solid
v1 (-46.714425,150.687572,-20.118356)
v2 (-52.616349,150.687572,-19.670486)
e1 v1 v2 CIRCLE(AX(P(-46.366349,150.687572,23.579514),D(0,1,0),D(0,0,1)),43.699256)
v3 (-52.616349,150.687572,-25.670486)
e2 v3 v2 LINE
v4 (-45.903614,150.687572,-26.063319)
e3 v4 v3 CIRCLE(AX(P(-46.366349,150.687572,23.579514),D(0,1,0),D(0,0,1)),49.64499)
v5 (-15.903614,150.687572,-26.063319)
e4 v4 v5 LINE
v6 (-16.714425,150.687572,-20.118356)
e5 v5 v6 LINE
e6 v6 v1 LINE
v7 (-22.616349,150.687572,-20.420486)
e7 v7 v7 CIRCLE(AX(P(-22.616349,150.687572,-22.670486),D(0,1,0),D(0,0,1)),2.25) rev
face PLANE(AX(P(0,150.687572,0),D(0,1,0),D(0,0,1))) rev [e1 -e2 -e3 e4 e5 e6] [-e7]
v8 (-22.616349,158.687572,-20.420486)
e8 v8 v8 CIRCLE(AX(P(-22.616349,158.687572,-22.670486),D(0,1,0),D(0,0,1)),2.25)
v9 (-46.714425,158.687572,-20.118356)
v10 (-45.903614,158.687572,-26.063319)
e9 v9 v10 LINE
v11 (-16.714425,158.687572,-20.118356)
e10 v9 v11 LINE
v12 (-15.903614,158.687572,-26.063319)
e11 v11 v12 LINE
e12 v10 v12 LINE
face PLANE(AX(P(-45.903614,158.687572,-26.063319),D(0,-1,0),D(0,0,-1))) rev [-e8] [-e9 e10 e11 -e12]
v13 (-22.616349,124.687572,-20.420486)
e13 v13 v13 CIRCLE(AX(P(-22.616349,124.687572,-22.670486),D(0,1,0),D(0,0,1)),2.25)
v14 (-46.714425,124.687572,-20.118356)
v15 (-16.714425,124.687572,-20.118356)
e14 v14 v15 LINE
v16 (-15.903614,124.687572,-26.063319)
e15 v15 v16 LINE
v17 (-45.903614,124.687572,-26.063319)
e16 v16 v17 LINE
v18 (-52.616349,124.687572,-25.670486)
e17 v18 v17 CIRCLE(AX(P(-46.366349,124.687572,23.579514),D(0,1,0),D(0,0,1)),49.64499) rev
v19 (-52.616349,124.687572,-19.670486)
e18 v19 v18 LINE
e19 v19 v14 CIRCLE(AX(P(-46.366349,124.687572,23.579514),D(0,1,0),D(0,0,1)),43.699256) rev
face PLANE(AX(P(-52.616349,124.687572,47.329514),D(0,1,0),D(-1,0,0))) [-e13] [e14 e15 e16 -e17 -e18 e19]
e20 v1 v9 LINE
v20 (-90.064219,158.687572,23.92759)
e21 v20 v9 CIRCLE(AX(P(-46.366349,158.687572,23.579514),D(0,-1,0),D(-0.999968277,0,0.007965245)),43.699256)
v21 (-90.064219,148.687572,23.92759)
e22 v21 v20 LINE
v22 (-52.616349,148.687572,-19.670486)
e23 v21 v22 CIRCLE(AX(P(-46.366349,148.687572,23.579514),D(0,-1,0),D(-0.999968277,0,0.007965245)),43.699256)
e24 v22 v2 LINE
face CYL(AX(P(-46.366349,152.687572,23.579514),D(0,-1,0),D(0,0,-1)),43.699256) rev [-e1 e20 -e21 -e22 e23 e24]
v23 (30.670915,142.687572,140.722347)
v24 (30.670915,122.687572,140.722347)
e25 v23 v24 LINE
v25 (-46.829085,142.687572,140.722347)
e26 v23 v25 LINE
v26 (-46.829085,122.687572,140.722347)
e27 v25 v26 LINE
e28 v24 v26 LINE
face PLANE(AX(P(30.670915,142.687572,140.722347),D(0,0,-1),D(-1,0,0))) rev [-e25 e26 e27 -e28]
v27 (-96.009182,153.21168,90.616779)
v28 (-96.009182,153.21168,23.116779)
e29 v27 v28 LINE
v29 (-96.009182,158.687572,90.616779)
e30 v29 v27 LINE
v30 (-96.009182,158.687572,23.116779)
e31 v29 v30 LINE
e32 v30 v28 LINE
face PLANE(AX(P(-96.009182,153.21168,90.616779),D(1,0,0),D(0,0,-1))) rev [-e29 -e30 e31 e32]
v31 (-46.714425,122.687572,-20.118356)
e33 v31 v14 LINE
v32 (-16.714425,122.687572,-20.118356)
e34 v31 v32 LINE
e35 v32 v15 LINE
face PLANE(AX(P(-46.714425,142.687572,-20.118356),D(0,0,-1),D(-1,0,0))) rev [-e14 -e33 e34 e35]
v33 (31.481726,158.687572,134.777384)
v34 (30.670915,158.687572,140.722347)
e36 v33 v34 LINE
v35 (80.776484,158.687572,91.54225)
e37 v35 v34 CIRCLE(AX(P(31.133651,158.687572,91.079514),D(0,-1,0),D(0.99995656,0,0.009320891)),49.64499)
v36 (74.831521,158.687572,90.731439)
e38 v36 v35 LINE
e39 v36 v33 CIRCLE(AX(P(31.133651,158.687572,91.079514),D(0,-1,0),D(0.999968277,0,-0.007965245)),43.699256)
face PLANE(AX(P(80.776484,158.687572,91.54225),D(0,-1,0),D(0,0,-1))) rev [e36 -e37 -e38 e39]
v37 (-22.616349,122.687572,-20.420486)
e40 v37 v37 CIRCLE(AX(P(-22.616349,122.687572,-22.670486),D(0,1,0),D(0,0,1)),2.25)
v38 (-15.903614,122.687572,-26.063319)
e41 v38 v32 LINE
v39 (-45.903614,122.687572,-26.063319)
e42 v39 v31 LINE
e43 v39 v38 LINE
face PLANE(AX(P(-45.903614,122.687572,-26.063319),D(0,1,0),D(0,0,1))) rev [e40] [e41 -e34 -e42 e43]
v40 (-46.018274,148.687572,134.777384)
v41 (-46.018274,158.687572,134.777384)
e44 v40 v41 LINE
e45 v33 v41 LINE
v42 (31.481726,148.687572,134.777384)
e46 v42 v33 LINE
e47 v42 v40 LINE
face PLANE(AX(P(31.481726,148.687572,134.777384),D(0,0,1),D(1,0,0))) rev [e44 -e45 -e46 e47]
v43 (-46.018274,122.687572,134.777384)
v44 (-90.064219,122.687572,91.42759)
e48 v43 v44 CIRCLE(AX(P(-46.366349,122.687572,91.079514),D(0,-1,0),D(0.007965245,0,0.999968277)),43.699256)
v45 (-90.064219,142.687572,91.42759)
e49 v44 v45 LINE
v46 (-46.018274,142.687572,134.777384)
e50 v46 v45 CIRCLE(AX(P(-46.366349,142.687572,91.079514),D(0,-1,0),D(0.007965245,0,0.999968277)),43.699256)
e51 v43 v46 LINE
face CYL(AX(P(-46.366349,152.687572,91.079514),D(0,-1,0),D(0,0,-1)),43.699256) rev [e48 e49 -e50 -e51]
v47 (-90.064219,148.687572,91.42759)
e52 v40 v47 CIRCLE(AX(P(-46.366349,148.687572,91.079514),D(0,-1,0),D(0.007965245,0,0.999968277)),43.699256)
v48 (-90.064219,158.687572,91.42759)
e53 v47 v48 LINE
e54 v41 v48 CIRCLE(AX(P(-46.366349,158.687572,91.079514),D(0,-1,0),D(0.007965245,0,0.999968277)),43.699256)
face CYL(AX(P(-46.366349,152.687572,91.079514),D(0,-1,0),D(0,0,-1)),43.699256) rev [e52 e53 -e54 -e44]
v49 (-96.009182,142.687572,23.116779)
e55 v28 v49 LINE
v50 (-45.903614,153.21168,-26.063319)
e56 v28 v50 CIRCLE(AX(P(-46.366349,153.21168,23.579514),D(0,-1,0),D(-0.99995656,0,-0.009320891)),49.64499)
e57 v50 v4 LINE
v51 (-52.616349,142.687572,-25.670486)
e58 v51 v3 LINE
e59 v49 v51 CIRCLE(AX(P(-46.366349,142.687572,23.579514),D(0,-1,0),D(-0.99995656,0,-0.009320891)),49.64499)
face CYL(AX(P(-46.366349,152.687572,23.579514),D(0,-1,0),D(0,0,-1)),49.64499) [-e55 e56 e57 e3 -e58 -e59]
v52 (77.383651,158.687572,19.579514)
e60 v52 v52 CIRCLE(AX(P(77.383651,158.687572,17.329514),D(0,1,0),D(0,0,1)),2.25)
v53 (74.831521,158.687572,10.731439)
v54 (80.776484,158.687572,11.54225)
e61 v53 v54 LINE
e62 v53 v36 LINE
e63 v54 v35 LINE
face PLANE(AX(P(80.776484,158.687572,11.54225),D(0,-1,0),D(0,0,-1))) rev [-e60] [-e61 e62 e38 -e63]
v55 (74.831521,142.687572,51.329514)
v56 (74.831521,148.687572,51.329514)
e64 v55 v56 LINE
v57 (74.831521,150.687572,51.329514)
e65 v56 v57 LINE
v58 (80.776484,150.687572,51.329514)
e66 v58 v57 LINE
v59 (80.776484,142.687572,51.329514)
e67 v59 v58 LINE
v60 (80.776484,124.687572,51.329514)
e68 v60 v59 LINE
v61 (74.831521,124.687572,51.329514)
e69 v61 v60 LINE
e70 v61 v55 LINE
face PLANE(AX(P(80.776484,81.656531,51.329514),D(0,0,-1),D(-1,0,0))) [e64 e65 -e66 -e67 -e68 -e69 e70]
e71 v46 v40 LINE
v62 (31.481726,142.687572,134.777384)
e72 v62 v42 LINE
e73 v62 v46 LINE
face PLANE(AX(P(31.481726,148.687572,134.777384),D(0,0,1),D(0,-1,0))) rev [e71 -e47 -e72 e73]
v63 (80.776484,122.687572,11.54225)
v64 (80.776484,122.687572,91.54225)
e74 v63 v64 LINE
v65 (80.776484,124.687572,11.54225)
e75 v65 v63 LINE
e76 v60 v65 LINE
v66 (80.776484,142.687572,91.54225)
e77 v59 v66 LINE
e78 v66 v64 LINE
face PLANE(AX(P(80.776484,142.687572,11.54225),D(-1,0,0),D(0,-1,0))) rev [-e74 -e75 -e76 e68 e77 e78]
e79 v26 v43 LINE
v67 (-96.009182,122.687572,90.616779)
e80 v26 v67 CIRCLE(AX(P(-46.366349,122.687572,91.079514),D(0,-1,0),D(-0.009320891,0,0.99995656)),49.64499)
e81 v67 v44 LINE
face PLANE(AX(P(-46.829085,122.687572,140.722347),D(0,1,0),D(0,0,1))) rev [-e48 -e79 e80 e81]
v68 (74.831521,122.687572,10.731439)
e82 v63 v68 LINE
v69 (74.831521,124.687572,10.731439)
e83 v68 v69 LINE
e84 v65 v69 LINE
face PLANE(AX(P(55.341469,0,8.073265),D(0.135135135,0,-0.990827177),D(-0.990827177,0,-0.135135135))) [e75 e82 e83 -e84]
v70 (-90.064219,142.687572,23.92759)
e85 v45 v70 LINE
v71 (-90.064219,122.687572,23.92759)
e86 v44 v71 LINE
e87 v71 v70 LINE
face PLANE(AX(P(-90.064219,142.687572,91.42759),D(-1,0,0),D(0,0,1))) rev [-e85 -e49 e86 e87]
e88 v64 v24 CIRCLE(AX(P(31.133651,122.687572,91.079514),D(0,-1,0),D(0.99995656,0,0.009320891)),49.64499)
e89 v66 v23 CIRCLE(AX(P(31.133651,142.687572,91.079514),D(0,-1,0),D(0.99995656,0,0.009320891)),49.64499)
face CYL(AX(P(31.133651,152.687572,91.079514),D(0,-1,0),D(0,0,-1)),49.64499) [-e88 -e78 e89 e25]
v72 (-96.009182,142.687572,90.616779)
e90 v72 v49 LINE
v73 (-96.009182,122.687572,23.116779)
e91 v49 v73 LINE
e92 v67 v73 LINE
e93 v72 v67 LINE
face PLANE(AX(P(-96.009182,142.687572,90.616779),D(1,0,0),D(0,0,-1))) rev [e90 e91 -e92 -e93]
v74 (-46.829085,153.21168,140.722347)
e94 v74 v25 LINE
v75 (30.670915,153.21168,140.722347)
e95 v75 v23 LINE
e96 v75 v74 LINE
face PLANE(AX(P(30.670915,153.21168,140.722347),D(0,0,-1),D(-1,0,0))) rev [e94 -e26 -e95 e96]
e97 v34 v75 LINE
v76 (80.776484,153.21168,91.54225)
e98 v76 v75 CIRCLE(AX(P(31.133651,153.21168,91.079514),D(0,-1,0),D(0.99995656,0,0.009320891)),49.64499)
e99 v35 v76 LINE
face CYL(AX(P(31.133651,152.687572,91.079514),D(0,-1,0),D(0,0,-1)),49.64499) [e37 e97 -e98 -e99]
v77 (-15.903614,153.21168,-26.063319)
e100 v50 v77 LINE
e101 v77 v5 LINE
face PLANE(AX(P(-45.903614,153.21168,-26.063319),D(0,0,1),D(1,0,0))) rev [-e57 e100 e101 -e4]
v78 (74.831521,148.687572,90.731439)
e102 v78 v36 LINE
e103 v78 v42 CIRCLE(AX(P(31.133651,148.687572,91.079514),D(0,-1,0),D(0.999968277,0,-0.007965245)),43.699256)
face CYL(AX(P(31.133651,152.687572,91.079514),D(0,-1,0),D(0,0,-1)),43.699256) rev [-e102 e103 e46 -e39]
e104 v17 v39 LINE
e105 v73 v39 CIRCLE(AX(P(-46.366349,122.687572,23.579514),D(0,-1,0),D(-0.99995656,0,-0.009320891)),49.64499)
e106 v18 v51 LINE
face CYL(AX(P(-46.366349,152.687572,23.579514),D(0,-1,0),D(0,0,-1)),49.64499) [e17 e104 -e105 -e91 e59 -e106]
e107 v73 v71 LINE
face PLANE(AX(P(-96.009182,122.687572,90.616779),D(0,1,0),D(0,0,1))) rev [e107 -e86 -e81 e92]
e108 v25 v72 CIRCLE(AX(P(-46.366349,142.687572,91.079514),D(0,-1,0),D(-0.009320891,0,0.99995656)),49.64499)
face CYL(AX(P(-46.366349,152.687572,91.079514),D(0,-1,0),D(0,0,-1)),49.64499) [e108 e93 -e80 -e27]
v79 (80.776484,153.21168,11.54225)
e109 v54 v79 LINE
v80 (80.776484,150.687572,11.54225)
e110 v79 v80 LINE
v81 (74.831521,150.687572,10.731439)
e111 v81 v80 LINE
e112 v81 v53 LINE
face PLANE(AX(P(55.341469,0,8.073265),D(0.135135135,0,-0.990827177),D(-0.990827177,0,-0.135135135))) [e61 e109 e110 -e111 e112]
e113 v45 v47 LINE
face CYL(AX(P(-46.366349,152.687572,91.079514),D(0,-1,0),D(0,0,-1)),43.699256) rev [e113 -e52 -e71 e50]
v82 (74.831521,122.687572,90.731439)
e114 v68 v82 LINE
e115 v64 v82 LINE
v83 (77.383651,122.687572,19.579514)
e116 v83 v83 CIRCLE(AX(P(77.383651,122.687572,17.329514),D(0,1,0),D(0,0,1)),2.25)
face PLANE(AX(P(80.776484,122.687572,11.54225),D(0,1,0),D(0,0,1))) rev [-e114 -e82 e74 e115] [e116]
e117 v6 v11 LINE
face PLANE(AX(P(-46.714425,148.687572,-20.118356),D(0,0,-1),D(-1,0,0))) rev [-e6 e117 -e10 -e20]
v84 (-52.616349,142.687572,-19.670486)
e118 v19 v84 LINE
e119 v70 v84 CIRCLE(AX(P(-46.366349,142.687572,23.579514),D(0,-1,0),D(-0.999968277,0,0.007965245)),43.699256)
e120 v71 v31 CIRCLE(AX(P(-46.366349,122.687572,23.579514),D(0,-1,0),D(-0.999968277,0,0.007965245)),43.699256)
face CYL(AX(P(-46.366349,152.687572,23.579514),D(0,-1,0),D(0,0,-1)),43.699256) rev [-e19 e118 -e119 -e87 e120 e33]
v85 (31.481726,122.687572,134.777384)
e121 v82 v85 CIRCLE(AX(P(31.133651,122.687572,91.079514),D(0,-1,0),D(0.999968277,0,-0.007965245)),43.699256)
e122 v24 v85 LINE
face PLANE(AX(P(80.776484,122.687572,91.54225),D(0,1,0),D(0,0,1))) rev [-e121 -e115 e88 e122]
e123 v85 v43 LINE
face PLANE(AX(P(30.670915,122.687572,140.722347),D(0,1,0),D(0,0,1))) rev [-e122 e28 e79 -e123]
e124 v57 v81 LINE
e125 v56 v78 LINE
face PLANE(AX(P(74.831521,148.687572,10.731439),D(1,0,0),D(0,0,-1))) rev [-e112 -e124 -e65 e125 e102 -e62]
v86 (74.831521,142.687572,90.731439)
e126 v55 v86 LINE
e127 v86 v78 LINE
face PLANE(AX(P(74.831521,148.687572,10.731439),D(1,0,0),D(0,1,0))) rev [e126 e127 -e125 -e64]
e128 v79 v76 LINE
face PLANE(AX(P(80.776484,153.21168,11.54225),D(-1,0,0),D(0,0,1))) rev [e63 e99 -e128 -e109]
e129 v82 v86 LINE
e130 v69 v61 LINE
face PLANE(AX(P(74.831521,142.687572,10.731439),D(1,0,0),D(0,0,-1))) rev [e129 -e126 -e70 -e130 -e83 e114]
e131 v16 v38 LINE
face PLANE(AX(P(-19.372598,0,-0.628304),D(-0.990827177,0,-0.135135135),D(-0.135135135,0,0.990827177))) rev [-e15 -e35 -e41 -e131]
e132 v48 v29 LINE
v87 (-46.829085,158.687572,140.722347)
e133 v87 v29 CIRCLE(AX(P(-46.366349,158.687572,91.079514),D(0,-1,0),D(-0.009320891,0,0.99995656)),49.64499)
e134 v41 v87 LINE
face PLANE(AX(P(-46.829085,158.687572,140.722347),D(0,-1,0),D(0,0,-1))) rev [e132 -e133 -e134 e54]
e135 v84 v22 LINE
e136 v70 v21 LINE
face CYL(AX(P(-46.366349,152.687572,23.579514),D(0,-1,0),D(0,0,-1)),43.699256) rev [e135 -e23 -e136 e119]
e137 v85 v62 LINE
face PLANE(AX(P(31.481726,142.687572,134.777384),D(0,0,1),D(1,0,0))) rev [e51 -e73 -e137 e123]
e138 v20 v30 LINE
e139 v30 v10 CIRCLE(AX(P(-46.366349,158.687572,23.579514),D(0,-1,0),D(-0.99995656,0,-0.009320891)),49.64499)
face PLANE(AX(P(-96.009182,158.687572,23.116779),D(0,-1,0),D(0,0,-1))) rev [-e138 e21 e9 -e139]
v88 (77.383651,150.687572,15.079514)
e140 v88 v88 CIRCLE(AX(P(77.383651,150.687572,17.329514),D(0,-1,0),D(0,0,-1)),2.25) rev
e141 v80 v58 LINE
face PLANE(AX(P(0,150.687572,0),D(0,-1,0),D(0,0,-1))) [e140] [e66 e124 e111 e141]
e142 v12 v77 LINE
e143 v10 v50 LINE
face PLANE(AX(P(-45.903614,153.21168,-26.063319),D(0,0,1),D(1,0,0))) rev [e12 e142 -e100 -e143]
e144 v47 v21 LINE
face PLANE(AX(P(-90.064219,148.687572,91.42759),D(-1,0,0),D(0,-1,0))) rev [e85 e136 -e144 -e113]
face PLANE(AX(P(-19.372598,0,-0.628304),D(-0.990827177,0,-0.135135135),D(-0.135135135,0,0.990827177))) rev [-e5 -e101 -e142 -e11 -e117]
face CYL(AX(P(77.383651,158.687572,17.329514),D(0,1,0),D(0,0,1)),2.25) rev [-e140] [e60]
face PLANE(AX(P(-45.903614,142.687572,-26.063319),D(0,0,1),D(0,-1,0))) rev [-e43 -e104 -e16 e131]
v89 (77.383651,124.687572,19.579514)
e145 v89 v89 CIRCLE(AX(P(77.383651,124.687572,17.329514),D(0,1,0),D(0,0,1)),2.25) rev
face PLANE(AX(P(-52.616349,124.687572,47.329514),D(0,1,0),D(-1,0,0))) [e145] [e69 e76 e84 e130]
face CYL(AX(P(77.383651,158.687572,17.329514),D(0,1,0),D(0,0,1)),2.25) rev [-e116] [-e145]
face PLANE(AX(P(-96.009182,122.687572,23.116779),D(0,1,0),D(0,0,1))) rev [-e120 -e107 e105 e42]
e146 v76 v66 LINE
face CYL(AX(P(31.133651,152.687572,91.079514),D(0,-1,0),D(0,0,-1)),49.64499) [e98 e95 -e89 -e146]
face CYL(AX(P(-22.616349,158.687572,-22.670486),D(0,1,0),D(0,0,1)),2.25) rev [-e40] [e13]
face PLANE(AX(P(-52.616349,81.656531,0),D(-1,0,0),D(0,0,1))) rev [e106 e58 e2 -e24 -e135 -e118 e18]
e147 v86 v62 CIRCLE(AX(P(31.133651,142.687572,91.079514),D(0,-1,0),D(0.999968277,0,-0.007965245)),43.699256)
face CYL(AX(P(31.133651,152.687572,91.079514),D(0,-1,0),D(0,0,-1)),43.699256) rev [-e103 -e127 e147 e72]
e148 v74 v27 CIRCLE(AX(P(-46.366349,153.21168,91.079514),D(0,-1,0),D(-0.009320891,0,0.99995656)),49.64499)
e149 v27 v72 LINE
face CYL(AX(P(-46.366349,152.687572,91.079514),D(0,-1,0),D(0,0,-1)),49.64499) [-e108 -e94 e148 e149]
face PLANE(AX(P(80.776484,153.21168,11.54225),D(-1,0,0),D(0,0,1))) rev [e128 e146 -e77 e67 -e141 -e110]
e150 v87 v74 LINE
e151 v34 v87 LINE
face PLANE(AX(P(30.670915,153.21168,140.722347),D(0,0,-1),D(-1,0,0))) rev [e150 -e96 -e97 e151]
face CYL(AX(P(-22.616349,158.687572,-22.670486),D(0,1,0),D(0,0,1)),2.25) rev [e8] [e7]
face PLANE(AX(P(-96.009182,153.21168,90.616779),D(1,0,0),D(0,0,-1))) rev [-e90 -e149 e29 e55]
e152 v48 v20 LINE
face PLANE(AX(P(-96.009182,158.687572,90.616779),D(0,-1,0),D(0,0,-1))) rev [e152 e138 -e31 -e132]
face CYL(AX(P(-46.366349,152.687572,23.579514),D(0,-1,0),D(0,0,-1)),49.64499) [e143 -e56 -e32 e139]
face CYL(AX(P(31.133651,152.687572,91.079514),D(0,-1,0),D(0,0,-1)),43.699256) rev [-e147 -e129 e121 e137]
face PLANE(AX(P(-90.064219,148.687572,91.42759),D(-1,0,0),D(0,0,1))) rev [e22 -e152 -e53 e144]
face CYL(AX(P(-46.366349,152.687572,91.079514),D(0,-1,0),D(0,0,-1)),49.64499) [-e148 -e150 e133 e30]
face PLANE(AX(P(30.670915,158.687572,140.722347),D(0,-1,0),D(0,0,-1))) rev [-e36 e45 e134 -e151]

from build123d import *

# Parameters (mm, degrees)
M4_CLEARANCE_HOLE1_D   = 4.5
CUT_EXTRUDE1_START     = -24
CUT_EXTRUDE1_OUTLINE_R = 2.25
CUT_EXTRUDE1_DEPTH     = 26
SKETCH8_R              = 2.25
CUT_EXTRUDE2_DEPTH     = 26


# Read off the part's stored shape, not the designer's step: Cut-Extrude1
with BuildPart() as part:
    # Sweep1: sweep along a path in Sketch1
    with BuildLine(Plane(origin=(0, 152.68757152, 0), x_dir=(1, 0, 0), z_dir=(0, 1, 0))) as sweep1_path:
        Line((77.38365074, -11.079514347), (77.38365074, -91.079514347))
        ThreePointArc((77.38365074, -91.079514347), (63.83733937, -123.783202977), (31.13365074, -137.329514347))
        Line((31.13365074, -137.329514347), (-46.36634926, -137.329514347))
        ThreePointArc((-46.36634926, -137.329514347), (-79.07003789, -123.783202977), (-92.61634926, -91.079514347))
        Line((-92.61634926, -91.079514347), (-92.61634926, -23.579514347))
        ThreePointArc((-92.61634926, -23.579514347), (-79.07003789, 9.124174283), (-46.36634926, 22.670485653))
        Line((-46.36634926, 22.670485653), (-16.36634926, 22.670485653))
    # Sketch2 → Sweep1 (sweep)
    with BuildSketch(Plane.ZY.offset(52.61634926)):
        Polygon((-25.670485653, 153.211679549), (-25.670485653, 158.68757152), (-19.670485653, 158.68757152), (-19.670485653, 148.68757152), (-19.670485653, 142.68757152), (-19.670485653, 122.68757152), (-25.670485653, 122.68757152), (-25.670485653, 142.68757152), align=None)
    sweep(path=sweep1_path.line)

    # M4 Clearance Hole1 (through all)
    with Locations(Plane(origin=(0, 158.68757152, 0), x_dir=(1, 0, 0), z_dir=(0, 1, 0))):
        with Locations((-22.61634926, 22.670485653), (77.38365074, -17.329514347)):
            Hole(M4_CLEARANCE_HOLE1_D / 2)

    # Cut-Extrude1 outline → Cut-Extrude1 (cut)
    # profile 1 of 2: a face of its own
    with BuildSketch(Plane(origin=(0, 148.68757152, 0), x_dir=(1, 0, 0), z_dir=(0, 1, 0)).offset(CUT_EXTRUDE1_START)):
        Polygon((74.831520752, -51.329514347), (80.776483816, -51.329514347), (80.776483816, -11.542249894), (74.831520752, -10.731439084), align=None)
        with Locations((77.38365074, -17.329514347)):
            Circle(CUT_EXTRUDE1_OUTLINE_R, mode=Mode.SUBTRACT)
    # profile 2 of 2: a face of its own
    with BuildSketch(Plane(origin=(0, 148.68757152, 0), x_dir=(1, 0, 0), z_dir=(0, 1, 0)).offset(CUT_EXTRUDE1_START)):
        with BuildLine():
            ThreePointArc((-45.903613713, 26.063318729), (-49.266640093, 25.980684534), (-52.61634926, 25.670485653))
            Line((-52.61634926, 25.670485653), (-52.61634926, 19.670485653))
            ThreePointArc((-52.61634926, 19.670485653), (-49.672978387, 19.99445958), (-46.714424523, 20.118355665))
            Line((-46.714424523, 20.118355665), (-16.714424523, 20.118355665))
            Line((-16.714424523, 20.118355665), (-15.903613713, 26.063318729))
            Line((-15.903613713, 26.063318729), (-45.903613713, 26.063318729))
        make_face()
        with Locations((-42.61634926, 22.670485653)):
            Circle(CUT_EXTRUDE1_OUTLINE_R, mode=Mode.SUBTRACT)
        with Locations((-22.61634926, 22.670485653)):
            Circle(CUT_EXTRUDE1_OUTLINE_R, mode=Mode.SUBTRACT)
    extrude(amount=CUT_EXTRUDE1_DEPTH, mode=Mode.SUBTRACT)

    # Sketch8 → Cut-Extrude2 (cut)
    with BuildSketch(Plane(origin=(0, 124.68757152, 0), x_dir=(1, 0, 0), z_dir=(0, 1, 0))):
        with Locations(Location((-22.61634926, 22.670485653, 0), (0, 0, 270))):
            Circle(SKETCH8_R)
        with Locations((-42.61634926, 22.670485653)):
            Circle(SKETCH8_R)
    extrude(amount=CUT_EXTRUDE2_DEPTH, mode=Mode.SUBTRACT)


solid = part.part
